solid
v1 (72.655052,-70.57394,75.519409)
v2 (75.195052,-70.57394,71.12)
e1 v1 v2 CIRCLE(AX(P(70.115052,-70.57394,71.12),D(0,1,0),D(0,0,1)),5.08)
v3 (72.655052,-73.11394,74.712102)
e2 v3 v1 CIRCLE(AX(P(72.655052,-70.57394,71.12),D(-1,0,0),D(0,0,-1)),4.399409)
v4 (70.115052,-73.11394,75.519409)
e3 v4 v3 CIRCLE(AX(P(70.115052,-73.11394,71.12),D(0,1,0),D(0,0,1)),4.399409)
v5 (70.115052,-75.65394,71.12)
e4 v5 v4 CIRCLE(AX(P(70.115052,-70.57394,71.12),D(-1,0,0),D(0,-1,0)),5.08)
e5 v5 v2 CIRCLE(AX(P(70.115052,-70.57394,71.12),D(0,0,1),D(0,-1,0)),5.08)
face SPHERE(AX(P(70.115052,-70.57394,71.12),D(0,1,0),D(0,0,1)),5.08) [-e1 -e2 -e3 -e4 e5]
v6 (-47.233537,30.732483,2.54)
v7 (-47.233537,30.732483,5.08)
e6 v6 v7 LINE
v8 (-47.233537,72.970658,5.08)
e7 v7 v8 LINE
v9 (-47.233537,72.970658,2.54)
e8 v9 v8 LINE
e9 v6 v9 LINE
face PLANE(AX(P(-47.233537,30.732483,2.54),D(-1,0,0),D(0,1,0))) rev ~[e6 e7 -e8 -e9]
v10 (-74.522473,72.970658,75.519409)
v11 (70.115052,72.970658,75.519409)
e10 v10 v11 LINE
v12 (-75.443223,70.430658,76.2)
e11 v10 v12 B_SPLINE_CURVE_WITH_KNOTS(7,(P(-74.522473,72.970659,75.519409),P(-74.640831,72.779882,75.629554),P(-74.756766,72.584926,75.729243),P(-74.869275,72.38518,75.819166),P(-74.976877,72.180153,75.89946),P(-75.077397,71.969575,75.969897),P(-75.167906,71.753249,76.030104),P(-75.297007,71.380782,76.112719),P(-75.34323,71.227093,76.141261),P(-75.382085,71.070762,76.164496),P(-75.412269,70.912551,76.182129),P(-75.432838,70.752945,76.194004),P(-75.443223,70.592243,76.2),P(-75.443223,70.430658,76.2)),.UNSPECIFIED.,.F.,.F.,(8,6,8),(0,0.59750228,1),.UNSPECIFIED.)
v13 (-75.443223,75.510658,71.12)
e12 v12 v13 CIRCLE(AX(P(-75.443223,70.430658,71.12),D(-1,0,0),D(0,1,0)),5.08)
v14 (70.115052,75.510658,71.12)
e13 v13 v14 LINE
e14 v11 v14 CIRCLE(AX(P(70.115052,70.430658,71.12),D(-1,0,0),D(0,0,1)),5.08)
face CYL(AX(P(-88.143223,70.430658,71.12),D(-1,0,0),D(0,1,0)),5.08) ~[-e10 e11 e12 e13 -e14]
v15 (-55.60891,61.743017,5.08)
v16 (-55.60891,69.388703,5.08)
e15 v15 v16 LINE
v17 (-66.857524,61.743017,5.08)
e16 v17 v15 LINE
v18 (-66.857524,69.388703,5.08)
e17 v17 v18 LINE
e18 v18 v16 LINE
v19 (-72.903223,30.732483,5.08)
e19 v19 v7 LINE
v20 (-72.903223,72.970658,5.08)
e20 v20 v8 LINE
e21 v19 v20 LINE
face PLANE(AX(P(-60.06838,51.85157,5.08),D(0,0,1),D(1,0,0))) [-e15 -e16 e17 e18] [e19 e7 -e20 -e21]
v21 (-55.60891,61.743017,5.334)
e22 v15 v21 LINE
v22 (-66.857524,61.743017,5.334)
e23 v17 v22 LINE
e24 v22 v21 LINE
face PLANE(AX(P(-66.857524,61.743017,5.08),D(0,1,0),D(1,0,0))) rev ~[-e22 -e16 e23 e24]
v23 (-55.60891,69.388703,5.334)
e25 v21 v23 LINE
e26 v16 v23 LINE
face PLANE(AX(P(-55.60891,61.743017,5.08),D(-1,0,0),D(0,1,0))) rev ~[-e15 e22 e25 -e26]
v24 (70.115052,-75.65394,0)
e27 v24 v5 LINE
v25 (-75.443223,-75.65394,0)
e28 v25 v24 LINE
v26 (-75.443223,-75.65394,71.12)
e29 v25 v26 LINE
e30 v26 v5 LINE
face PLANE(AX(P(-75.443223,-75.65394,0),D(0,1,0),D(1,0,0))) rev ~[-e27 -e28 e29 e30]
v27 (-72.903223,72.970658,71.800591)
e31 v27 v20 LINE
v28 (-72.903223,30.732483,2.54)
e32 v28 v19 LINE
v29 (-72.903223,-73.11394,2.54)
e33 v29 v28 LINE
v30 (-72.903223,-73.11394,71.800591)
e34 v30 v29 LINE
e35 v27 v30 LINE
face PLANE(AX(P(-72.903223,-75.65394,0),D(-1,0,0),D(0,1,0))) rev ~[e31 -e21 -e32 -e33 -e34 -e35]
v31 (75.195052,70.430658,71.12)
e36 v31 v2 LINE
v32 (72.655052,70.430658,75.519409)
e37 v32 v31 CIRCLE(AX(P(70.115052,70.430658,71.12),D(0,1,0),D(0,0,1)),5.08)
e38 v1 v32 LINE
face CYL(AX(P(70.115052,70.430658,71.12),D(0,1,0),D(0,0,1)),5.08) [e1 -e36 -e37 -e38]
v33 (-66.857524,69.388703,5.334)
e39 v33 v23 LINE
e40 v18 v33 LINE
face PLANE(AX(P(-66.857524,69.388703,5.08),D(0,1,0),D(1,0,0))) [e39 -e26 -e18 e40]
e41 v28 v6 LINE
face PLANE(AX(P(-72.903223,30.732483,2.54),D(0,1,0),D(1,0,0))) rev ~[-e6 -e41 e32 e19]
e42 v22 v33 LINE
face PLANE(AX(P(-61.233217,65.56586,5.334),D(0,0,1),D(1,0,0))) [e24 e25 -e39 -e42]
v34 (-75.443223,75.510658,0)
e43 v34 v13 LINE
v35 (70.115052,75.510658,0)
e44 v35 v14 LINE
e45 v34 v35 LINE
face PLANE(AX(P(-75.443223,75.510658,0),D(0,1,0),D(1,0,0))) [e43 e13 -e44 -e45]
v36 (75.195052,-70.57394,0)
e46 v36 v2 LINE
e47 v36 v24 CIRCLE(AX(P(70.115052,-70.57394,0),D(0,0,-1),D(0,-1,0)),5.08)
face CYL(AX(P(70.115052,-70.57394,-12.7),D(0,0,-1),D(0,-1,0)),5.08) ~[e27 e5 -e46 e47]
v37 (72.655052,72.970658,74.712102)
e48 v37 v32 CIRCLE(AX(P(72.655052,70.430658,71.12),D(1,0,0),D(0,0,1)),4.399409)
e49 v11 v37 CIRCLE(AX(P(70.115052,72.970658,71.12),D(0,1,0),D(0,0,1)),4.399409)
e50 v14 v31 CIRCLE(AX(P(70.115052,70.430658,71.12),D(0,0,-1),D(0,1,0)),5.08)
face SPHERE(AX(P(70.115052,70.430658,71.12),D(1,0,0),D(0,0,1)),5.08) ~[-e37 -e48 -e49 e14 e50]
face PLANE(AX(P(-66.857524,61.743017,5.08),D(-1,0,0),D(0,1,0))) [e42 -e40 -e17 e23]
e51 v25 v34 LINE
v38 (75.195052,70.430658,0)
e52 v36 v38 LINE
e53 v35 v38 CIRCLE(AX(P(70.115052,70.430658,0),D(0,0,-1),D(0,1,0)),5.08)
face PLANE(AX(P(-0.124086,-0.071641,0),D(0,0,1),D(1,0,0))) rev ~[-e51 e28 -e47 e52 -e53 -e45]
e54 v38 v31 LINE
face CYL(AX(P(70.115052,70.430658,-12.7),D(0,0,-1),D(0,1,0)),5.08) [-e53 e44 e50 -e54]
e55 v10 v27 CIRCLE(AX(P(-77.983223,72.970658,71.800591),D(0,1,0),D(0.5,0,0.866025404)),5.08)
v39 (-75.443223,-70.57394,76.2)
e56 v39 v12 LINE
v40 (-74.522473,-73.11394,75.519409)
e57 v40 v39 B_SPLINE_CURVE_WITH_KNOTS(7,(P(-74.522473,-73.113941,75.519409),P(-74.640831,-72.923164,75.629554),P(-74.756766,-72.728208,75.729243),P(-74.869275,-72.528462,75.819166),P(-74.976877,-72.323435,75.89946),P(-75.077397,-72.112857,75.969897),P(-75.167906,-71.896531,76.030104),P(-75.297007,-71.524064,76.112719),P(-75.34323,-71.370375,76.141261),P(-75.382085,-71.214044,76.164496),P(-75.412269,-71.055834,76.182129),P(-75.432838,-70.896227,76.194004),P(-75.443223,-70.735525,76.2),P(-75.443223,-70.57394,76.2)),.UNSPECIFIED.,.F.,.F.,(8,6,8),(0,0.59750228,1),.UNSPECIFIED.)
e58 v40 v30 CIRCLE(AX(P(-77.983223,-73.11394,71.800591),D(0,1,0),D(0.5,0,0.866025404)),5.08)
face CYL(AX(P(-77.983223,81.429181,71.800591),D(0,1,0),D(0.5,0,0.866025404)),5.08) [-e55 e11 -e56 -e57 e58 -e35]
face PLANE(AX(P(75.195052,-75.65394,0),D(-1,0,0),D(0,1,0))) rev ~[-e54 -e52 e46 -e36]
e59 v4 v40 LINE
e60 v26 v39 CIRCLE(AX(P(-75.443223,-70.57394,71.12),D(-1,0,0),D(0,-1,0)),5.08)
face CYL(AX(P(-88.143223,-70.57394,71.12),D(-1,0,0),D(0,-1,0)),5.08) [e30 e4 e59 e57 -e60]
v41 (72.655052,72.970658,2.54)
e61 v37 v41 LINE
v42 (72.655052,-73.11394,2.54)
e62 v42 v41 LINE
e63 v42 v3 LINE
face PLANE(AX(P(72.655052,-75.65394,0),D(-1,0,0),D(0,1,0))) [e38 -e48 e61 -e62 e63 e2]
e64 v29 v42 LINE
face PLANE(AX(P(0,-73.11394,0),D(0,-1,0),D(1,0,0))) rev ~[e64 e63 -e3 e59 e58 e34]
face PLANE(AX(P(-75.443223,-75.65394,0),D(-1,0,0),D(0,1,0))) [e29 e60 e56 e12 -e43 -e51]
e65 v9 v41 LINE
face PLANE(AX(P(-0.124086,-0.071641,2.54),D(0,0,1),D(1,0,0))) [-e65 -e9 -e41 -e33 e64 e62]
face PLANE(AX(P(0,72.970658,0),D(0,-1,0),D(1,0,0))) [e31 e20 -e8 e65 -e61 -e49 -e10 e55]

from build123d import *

# Parameters (mm, degrees)
F0_W        = 150.6382748485
F0_H        = 151.164598763
F1_DEPTH    = 76.2
F2_T        = -2.54
F3_T1_DEPTH = 176.0382748485
F4_T1_DEPTH = 158.784598763
F4_T3_DEPTH = 83.82
F4_T6_ANGLE = 89.9999999979
F5_T1_DEPTH = 158.2582748485
F5_T3_DEPTH = 83.82
F5_T6_ANGLE = 89.9999999979
F6_T4_DEPTH = 163.0016440191
F7_W        = 25.6696862793
F7_H        = 42.238175652
F8_DEPTH    = 2.54
F9_W        = 11.248614639
F9_H        = 7.6456852257
F10_DEPTH   = 0.254


# Not quite as in the source:
# - a fillet or chamfer that OpenCascade refuses, or shapes differently, is made with other operations: its cross-section is extruded or revolved along the edge and cut away or added


with BuildPart() as f1:
    # F0 (on Top) → F1 (new body)
    with BuildSketch(Plane.XY):
        with Locations((-0.1240856946, -0.0716410577)):
            Rectangle(F0_W, F0_H)
    extrude(amount=F1_DEPTH)

    # F2
    f2_openings = [f1.faces().sort_by_distance(p)[0] for p in [
        (-0.124086, -0.071641, 76.2),
    ]]
    offset(amount=F2_T, openings=f2_openings)

    # F3: fillet of radius 5.08 on 1 edges, made by hand

    # F3_s2 → F3_t1 (cut)
    with BuildSketch(Plane.YZ.offset(-88.1432231188)):
        with BuildLine():
            ThreePointArc((75.5106583238, 71.12), (74.0227607722, 74.7121024484), (70.4306583238, 76.2))
            Line((70.4306583238, 76.2), (75.5106583238, 76.2))
            Line((75.5106583238, 76.2), (75.5106583238, 71.12))
        make_face()
    extrude(amount=F3_T1_DEPTH, mode=Mode.SUBTRACT)

    # F4: fillet of radius 5.08 on 1 edges, made by hand

    # F4_s2 → F4_t1 (cut)
    with BuildSketch(Plane.XZ.offset(-70.4306583238)):
        with BuildLine():
            ThreePointArc((70.1150517297, 76.2), (73.7071541781, 74.7121024484), (75.1950517297, 71.12))
            Line((75.1950517297, 71.12), (75.1950517297, 76.2))
            Line((75.1950517297, 76.2), (70.1150517297, 76.2))
        make_face()
    extrude(amount=F4_T1_DEPTH, mode=Mode.SUBTRACT)

    # F4_s4 → F4_t3 (cut)
    with BuildSketch(Plane.XY.offset(-12.7)):
        with BuildLine():
            ThreePointArc((70.1150517297, 75.5106583238), (73.7071541781, 74.0227607722), (75.1950517297, 70.4306583238))
            Line((75.1950517297, 70.4306583238), (75.1950517297, 75.5106583238))
            Line((75.1950517297, 75.5106583238), (70.1150517297, 75.5106583238))
        make_face()
    extrude(amount=F4_T3_DEPTH, mode=Mode.SUBTRACT)

    # F4_s5 → F4_t6 (revolve, cut)
    with BuildSketch(Plane.XZ.offset(-70.4306583237)):
        with BuildLine():
            ThreePointArc((70.1150517297, 76.2), (73.7071541781, 74.7121024484), (75.1950517297, 71.12))
            Line((75.1950517297, 71.12), (75.1950517297, 76.2))
            Line((75.1950517297, 76.2), (70.1150517297, 76.2))
        make_face()
    revolve(axis=Axis((75.1950517297, 70.4306583237, 71.1199999999), (-1, 0, 0)), revolution_arc=F4_T6_ANGLE, mode=Mode.SUBTRACT)

    # F5: fillet of radius 5.08 on 1 edges, made by hand

    # F5_s2 → F5_t1 (cut)
    with BuildSketch(Plane.YZ.offset(-88.1432231188)):
        with BuildLine():
            ThreePointArc((-75.6539404392, 71.12), (-74.1660428877, 74.7121024484), (-70.5739404392, 76.2))
            Line((-70.5739404392, 76.2), (-75.6539404392, 76.2))
            Line((-75.6539404392, 76.2), (-75.6539404392, 71.12))
        make_face()
    extrude(amount=F5_T1_DEPTH, mode=Mode.SUBTRACT)

    # F5_s4 → F5_t3 (cut)
    with BuildSketch(Plane.XY.offset(-12.7)):
        with BuildLine():
            ThreePointArc((70.1150517297, -75.6539404392), (73.7071541781, -74.1660428877), (75.1950517297, -70.5739404392))
            Line((75.1950517297, -70.5739404392), (75.1950517297, -75.6539404392))
            Line((75.1950517297, -75.6539404392), (70.1150517297, -75.6539404392))
        make_face()
    extrude(amount=F5_T3_DEPTH, mode=Mode.SUBTRACT)

    # F5_s5 → F5_t6 (revolve, cut)
    with BuildSketch(Plane.YZ.offset(70.1150517296)):
        with BuildLine():
            ThreePointArc((-75.6539404392, 71.12), (-74.1660428877, 74.7121024484), (-70.5739404392, 76.2))
            Line((-70.5739404392, 76.2), (-75.6539404392, 76.2))
            Line((-75.6539404392, 76.2), (-75.6539404392, 71.12))
        make_face()
    revolve(axis=Axis((70.1150517296, -75.6539404392, 71.1199999999), (0, 1, 0)), revolution_arc=F5_T6_ANGLE, mode=Mode.SUBTRACT)

    # F6: fillet of radius 5.08 on 1 edges, made by hand


with BuildPart() as f6_tool2:
    # F6_s3 → F6_t4 (new body)
    with BuildSketch(Plane.XZ.offset(-81.4291809519)):
        with BuildLine():
            ThreePointArc((-75.4432231188, 76.2), (-73.5838140676, 74.3405909488), (-72.9032231188, 71.8005909488))
            Line((-72.9032231188, 71.8005909488), (-72.9032231188, 76.2))
            Line((-72.9032231188, 76.2), (-75.4432231188, 76.2))
        make_face()
    extrude(amount=F6_T4_DEPTH)

    split(bisect_by=Plane.XZ.offset(73.1139404392), keep=Keep.BOTTOM)

    split(bisect_by=Plane.XZ.offset(-72.9706583238), keep=Keep.TOP)


with BuildPart() as f1_1:
    add(f1.part)

    # F6_t1: cut F6_tool2
    add(f6_tool2.part, mode=Mode.SUBTRACT)

    # F7 (on face) → F8 (join)
    with BuildSketch(Plane.XY.offset(2.54)):
        with Locations((-60.0683799791, 51.8515704978)):
            Rectangle(F7_W, F7_H)
    extrude(amount=F8_DEPTH)

    # F9 (on face) → F10 (join)
    with BuildSketch(Plane.XY.offset(5.08)):
        with Locations((-61.2332168967, 65.5658598989)):
            Rectangle(F9_W, F9_H)
    extrude(amount=F10_DEPTH)


solid = f1_1.part
